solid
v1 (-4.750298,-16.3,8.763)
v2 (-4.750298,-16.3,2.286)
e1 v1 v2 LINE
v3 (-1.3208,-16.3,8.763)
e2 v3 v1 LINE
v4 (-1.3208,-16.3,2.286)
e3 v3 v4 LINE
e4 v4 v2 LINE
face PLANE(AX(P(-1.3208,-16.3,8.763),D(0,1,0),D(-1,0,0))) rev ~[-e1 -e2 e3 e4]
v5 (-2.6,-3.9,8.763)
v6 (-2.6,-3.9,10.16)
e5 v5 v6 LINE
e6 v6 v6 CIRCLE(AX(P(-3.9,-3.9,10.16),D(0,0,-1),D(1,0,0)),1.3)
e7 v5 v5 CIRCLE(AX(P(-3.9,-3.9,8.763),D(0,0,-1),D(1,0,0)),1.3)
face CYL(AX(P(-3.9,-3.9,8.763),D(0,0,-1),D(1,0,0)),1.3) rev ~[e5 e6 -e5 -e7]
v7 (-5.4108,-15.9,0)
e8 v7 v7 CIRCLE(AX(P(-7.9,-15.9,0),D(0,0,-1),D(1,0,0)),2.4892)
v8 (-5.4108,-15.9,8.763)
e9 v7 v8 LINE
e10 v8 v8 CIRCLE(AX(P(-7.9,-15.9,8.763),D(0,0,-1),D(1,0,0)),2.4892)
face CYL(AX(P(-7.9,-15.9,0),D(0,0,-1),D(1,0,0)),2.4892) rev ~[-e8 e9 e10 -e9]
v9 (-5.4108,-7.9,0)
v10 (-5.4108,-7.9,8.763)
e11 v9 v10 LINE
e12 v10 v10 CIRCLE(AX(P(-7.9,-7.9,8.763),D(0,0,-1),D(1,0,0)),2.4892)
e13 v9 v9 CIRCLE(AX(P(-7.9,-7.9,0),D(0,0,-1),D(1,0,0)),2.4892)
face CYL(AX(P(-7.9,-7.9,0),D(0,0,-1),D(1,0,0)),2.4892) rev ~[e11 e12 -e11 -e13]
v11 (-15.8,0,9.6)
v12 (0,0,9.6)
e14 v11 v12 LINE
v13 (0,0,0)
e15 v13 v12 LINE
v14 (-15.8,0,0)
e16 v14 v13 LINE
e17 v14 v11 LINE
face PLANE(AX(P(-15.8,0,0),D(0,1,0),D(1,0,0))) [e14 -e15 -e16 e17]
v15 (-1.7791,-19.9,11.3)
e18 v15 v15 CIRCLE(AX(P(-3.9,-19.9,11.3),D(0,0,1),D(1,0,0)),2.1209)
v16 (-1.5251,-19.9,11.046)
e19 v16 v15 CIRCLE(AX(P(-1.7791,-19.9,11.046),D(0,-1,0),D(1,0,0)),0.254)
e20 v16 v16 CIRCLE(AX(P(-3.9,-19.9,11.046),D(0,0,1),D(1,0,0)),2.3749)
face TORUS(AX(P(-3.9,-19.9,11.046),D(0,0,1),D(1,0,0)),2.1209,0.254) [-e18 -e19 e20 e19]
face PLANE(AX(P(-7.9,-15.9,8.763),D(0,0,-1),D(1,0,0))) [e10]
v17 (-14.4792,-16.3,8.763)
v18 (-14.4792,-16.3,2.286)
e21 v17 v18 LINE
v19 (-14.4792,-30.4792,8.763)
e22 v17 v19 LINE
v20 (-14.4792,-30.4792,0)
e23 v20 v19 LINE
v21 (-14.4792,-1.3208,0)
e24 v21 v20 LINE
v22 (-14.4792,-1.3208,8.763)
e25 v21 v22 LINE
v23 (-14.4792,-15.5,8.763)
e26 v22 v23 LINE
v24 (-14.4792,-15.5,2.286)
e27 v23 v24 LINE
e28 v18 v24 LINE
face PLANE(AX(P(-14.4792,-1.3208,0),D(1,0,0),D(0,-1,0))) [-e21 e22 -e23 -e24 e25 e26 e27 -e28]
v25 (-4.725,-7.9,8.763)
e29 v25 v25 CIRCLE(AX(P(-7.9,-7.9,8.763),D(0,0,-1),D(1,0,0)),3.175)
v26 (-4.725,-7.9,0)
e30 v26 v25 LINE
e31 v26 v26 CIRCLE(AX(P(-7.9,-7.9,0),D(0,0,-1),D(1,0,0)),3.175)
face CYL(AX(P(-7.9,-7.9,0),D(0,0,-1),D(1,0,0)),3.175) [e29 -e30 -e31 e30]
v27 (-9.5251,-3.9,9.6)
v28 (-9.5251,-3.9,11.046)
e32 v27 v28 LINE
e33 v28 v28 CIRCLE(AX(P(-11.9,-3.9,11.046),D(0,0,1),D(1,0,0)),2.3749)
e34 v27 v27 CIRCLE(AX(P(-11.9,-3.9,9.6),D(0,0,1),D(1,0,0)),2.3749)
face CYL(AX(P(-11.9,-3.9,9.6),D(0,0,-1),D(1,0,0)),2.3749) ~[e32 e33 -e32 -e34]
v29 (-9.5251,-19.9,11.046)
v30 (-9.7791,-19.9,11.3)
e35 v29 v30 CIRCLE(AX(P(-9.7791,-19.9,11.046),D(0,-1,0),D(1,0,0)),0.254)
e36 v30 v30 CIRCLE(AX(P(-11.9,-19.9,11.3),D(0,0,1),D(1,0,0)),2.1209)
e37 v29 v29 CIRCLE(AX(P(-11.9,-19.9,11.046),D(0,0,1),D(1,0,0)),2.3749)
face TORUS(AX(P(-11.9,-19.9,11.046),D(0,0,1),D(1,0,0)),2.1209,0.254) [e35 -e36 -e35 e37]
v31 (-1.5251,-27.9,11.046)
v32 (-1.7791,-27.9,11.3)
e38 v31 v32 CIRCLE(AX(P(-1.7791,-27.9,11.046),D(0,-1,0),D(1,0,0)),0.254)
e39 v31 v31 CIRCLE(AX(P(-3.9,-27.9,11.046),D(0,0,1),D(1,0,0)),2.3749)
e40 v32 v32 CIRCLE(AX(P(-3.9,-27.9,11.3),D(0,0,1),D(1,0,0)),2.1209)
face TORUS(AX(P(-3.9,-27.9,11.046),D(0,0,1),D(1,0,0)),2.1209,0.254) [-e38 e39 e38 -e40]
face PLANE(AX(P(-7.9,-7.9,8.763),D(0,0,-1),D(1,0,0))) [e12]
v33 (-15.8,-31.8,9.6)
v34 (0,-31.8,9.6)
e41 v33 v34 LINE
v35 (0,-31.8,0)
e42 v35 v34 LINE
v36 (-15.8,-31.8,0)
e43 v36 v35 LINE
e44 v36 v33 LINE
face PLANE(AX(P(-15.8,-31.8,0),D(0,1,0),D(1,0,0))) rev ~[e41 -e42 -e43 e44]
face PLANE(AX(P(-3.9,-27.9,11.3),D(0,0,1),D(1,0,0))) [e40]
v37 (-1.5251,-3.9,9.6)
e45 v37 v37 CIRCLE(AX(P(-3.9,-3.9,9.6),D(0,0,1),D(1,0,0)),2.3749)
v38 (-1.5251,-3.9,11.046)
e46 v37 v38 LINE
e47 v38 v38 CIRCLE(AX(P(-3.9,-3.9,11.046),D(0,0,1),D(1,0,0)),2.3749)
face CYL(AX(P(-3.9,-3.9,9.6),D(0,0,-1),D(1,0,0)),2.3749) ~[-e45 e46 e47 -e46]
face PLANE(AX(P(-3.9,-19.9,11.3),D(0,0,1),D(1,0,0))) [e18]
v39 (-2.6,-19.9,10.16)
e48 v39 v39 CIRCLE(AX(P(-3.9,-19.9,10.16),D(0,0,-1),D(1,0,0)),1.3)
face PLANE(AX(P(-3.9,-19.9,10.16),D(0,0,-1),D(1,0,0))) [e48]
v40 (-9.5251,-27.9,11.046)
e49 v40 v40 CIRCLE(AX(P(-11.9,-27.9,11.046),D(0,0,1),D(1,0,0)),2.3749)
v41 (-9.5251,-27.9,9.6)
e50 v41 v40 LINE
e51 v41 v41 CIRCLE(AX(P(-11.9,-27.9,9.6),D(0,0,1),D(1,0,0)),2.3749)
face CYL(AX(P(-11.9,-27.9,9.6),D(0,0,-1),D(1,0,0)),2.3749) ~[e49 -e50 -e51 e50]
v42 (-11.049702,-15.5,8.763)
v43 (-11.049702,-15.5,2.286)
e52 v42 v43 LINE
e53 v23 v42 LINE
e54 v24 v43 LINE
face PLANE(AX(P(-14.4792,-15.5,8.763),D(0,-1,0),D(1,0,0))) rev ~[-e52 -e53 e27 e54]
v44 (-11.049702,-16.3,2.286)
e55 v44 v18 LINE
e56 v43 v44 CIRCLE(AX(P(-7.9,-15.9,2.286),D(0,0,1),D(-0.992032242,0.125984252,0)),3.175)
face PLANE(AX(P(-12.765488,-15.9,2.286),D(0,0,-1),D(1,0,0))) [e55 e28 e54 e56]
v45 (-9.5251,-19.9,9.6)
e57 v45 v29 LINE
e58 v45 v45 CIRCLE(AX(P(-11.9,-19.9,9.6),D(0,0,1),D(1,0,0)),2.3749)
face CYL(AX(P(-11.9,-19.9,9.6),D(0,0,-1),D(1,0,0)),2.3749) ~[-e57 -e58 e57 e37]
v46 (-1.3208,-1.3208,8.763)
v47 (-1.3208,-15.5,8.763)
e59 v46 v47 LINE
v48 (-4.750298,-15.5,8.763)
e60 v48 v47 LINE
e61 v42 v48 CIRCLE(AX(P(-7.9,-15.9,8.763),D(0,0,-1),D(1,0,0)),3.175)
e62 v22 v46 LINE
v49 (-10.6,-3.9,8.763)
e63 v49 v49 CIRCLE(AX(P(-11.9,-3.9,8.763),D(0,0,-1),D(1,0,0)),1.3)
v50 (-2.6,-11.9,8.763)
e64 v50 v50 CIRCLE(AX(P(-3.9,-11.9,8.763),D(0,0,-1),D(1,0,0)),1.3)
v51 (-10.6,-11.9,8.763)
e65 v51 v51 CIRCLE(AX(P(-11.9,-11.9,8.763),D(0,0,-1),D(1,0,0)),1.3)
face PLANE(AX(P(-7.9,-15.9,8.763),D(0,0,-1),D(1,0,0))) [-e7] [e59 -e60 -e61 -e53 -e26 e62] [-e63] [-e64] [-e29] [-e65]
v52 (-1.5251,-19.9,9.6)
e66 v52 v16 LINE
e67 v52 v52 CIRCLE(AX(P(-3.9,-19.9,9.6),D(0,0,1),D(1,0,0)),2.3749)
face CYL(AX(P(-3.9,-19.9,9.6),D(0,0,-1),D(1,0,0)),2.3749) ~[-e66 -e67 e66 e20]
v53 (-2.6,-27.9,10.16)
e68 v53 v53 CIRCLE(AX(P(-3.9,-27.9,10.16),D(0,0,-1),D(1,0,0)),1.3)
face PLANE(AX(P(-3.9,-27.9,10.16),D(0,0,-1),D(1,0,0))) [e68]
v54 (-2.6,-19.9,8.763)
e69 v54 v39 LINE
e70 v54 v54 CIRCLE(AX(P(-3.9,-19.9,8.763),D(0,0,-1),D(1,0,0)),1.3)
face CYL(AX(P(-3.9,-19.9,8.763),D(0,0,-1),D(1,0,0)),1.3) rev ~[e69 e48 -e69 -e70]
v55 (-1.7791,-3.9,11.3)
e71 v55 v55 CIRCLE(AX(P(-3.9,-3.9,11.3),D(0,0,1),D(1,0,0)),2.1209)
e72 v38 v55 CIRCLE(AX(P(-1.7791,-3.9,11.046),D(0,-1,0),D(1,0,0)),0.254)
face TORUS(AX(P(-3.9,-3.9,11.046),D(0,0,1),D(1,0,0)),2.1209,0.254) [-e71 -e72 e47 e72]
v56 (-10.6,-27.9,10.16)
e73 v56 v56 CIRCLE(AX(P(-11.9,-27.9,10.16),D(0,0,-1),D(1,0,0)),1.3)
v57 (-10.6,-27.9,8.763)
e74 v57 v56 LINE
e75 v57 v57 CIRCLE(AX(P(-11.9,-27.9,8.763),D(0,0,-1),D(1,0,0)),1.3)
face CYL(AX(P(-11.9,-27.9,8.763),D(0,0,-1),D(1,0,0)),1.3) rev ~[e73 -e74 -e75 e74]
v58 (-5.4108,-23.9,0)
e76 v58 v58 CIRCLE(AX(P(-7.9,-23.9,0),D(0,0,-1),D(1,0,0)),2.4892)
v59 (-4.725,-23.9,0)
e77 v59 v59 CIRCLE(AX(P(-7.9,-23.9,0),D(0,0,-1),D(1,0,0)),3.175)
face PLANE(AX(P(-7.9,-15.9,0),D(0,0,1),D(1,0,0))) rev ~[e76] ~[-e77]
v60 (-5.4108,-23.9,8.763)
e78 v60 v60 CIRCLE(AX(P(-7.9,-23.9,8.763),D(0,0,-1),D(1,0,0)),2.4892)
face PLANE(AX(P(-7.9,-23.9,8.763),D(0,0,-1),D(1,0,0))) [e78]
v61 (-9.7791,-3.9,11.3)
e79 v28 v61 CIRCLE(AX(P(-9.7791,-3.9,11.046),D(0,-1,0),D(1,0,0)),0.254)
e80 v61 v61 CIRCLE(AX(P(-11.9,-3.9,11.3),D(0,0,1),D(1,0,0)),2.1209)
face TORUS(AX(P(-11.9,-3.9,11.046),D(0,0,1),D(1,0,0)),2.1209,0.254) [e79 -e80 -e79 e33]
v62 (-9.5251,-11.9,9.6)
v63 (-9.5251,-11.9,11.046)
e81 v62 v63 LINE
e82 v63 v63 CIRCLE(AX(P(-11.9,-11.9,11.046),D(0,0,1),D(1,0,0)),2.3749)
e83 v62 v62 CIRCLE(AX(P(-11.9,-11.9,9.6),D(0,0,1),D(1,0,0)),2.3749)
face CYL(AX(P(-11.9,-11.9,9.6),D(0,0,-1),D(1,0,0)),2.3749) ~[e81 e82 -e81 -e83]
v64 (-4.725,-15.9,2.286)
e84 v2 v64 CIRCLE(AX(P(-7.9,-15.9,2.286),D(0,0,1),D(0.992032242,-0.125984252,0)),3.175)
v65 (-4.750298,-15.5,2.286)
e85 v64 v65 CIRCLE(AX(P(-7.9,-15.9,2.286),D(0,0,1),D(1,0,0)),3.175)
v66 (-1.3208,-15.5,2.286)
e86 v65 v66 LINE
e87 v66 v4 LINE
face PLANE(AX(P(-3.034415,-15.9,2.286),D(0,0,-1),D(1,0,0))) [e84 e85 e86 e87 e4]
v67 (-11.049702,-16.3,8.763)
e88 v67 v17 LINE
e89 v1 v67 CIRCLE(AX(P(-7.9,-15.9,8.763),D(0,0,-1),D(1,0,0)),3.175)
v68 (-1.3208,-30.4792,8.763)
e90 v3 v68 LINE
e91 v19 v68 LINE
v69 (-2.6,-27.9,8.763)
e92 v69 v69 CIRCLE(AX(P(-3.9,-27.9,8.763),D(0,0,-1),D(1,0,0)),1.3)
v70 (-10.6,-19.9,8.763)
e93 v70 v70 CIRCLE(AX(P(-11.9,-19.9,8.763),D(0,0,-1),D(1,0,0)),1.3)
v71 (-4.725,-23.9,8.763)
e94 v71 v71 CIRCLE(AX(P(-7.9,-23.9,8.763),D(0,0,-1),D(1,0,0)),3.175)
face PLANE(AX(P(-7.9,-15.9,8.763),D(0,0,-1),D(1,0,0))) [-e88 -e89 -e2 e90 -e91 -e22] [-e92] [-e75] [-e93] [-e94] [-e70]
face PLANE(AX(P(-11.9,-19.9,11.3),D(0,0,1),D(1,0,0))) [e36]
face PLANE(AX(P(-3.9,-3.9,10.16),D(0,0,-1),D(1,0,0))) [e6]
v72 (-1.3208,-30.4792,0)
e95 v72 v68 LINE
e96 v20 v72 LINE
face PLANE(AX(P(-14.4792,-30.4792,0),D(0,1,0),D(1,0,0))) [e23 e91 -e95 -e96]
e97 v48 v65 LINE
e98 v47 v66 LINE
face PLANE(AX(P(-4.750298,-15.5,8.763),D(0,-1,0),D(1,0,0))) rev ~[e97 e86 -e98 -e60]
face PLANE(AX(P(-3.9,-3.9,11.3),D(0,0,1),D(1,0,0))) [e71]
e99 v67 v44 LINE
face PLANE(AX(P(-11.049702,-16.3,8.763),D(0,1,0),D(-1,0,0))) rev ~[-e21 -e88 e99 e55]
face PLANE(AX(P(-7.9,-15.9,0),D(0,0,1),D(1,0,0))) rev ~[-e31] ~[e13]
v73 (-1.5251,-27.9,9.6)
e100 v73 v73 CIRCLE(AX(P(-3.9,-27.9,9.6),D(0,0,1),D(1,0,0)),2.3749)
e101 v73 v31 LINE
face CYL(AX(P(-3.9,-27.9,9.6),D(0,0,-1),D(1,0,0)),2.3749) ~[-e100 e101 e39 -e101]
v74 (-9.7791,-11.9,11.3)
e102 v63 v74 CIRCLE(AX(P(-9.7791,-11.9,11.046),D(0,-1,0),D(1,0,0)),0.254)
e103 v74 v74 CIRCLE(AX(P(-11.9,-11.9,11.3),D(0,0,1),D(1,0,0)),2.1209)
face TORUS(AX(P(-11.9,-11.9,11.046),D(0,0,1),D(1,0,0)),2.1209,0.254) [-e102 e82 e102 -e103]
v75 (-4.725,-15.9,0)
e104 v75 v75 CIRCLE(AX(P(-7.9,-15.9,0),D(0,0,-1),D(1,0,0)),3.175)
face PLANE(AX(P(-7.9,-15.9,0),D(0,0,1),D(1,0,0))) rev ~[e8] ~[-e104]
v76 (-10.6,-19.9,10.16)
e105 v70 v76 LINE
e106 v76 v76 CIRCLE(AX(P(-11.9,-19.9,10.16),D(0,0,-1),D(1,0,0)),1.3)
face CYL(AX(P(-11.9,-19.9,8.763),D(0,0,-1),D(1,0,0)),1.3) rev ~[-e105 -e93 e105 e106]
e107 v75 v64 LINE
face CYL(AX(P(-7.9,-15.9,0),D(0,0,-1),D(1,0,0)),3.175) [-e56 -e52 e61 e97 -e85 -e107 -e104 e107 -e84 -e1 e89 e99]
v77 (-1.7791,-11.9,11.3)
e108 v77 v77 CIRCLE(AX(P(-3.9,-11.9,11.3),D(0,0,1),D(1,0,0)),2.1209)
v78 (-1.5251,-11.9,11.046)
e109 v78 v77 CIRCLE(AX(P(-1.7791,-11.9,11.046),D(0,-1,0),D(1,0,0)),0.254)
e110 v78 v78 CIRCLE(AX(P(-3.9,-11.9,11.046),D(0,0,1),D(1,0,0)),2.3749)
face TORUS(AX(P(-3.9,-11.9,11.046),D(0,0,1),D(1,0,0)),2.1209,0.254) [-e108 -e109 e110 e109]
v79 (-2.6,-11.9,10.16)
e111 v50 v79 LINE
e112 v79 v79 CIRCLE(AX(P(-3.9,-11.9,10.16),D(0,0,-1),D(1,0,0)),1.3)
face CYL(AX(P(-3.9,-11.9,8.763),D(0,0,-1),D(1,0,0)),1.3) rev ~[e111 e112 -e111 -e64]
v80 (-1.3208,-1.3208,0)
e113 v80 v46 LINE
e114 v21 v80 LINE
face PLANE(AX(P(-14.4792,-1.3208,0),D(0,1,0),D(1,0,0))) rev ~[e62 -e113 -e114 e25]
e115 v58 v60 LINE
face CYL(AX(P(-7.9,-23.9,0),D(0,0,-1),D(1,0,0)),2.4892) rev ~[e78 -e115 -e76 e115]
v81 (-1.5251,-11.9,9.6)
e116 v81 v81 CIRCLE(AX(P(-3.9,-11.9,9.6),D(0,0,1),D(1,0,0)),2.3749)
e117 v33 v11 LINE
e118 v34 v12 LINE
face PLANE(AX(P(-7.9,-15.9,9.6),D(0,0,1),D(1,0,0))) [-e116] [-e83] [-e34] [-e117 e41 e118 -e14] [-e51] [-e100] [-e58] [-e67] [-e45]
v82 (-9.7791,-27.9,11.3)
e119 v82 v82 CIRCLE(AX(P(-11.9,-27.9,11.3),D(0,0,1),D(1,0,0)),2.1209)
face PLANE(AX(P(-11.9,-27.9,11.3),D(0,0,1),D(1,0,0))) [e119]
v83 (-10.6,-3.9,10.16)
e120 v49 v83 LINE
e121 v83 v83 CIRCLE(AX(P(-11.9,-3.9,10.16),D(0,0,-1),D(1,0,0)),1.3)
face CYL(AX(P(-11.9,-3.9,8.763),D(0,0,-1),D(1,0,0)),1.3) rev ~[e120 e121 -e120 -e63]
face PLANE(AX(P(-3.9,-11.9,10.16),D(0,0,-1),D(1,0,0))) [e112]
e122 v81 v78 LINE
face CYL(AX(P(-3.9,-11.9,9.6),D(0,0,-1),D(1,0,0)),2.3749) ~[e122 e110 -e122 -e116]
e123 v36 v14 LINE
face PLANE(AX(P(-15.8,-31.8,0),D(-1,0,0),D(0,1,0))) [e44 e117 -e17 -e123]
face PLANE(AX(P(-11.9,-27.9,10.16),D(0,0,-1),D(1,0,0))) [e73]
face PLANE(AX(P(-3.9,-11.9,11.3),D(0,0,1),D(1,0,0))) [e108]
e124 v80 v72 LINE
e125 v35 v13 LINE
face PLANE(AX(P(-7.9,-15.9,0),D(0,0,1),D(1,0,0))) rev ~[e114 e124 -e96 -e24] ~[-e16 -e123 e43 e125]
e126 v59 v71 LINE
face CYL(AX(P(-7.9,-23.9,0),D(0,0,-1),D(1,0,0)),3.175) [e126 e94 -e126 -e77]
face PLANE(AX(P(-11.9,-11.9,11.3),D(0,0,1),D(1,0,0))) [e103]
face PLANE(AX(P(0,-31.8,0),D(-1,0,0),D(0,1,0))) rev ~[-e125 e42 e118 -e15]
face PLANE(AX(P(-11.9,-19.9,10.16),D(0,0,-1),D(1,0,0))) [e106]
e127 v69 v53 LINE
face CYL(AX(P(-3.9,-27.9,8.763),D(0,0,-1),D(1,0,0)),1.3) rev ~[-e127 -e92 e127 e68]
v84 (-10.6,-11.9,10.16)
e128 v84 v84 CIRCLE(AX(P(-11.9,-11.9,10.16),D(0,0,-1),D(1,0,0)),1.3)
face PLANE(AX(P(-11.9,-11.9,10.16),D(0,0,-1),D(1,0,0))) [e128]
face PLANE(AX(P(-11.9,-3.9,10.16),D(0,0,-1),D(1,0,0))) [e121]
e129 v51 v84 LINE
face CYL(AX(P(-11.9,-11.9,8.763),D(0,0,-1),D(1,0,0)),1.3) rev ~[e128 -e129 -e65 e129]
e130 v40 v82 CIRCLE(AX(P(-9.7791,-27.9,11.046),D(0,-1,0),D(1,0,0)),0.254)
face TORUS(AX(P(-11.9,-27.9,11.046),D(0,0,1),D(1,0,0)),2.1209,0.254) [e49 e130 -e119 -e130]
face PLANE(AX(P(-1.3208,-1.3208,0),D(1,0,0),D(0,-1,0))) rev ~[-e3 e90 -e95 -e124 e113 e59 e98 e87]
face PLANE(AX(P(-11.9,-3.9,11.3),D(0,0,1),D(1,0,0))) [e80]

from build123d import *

# Parameters (mm, degrees)
F0_W      = 15.8
F0_H      = 31.8
F1_DEPTH  = 9.6
F2_R      = 2.3749
F3_DEPTH  = 1.7
F4_W      = 13.1584
F4_H      = 29.1584
F4_R      = 3.175
F5_DEPTH  = 8.763
F4_R_2    = 2.4892
F6_DEPTH  = 8.763
F8_DEPTH  = 6.477
F9_R      = 1.3
F10_DEPTH = 1.397
F11_R     = 0.254


# Not quite as in the source:
# - a feature names something its author has since deleted; it is built from what else it names


with BuildPart() as f1:
    # F0 (on Top) → F1 (new body)
    with BuildSketch(Plane.XY):
        with Locations((-7.9, -15.9)):
            Rectangle(F0_W, F0_H)
    extrude(amount=F1_DEPTH)

    # F2 (on face) → F3 (join)
    with BuildSketch(Plane.XY.offset(9.6)):
        with Locations((-3.9, -3.9)):
            Circle(F2_R)
        with Locations((-3.9, -11.9)):
            Circle(F2_R)
        with Locations((-3.9, -19.9)):
            Circle(F2_R)
        with Locations((-3.9, -27.9)):
            Circle(F2_R)
        with Locations((-11.9, -3.9)):
            Circle(F2_R)
        with Locations((-11.9, -11.9)):
            Circle(F2_R)
        with Locations((-11.9, -19.9)):
            Circle(F2_R)
        with Locations((-11.9, -27.9)):
            Circle(F2_R)
    extrude(amount=F3_DEPTH)

    # F4 (on face) → F5 (cut)
    with BuildSketch(Plane(origin=(0, 0, 0), x_dir=(1, 0, 0), z_dir=(0, 0, -1))):
        with Locations((-7.9, 15.9)):
            Rectangle(F4_W, F4_H)
        with Locations((-7.9, 7.9)):
            Circle(F4_R, mode=Mode.SUBTRACT)
        with Locations((-7.9, 15.9)):
            Circle(F4_R, mode=Mode.SUBTRACT)
        with Locations((-7.9, 23.9)):
            Circle(F4_R, mode=Mode.SUBTRACT)
    extrude(amount=-F5_DEPTH, mode=Mode.SUBTRACT)

    # F4 (on face) → F6 (cut)
    with BuildSketch(Plane(origin=(0, 0, 0), x_dir=(1, 0, 0), z_dir=(0, 0, -1))):
        with Locations((-7.9, 23.9)):
            Circle(F4_R_2)
        with Locations((-7.9, 15.9)):
            Circle(F4_R_2)
        with Locations((-7.9, 7.9)):
            Circle(F4_R_2)
    extrude(amount=-F6_DEPTH, mode=Mode.SUBTRACT)

    # F7 (on face) → F8 (join)
    with BuildSketch(Plane(origin=(0, 0, 8.763), x_dir=(1, 0, 0), z_dir=(0, 0, -1))):
        with BuildLine():
            Line((-1.3208, 16.3), (-4.7502976331, 16.3))
            ThreePointArc((-4.7502976331, 16.3), (-4.7313307198, 16.1003995822), (-4.725, 15.9))
            ThreePointArc((-4.725, 15.9), (-4.7313307198, 15.6996004178), (-4.7502976331, 15.5))
            Line((-4.7502976331, 15.5), (-1.3208, 15.5))
            Line((-1.3208, 15.5), (-1.3208, 16.3))
        make_face()
        with BuildLine():
            Line((-11.0497023669, 16.3), (-14.4792, 16.3))
            Line((-14.4792, 16.3), (-14.4792, 15.5))
            Line((-14.4792, 15.5), (-11.0497023669, 15.5))
            ThreePointArc((-11.0497023669, 15.5), (-11.075, 15.9), (-11.0497023669, 16.3))
        make_face()
    extrude(amount=F8_DEPTH)

    # F9 (on face) → F10 (cut)
    with BuildSketch(Plane(origin=(0, 0, 8.763), x_dir=(1, 0, 0), z_dir=(0, 0, -1))):
        with Locations((-11.9, 3.9)):
            Circle(F9_R)
        with Locations((-11.9, 11.9)):
            Circle(F9_R)
        with Locations((-11.9, 19.9)):
            Circle(F9_R)
        with Locations((-11.9, 27.9)):
            Circle(F9_R)
        with Locations((-3.9, 3.9)):
            Circle(F9_R)
        with Locations((-3.9, 11.9)):
            Circle(F9_R)
        with Locations((-3.9, 19.9)):
            Circle(F9_R)
        with Locations((-3.9, 27.9)):
            Circle(F9_R)
    extrude(amount=-F10_DEPTH, mode=Mode.SUBTRACT)

    # F11
    f11_edges = [f1.edges().sort_by_distance(p)[0] for p in [
        (-14.2749, -3.9, 11.3),
        (-6.2749, -3.9, 11.3),
        (-14.2749, -11.9, 11.3),
        (-14.2749, -19.9, 11.3),
        (-6.2749, -11.9, 11.3),
        (-6.2749, -19.9, 11.3),
        (-14.2749, -27.9, 11.3),
        (-6.2749, -27.9, 11.3),
    ]]
    fillet(f11_edges, radius=F11_R)


solid = f1.part
